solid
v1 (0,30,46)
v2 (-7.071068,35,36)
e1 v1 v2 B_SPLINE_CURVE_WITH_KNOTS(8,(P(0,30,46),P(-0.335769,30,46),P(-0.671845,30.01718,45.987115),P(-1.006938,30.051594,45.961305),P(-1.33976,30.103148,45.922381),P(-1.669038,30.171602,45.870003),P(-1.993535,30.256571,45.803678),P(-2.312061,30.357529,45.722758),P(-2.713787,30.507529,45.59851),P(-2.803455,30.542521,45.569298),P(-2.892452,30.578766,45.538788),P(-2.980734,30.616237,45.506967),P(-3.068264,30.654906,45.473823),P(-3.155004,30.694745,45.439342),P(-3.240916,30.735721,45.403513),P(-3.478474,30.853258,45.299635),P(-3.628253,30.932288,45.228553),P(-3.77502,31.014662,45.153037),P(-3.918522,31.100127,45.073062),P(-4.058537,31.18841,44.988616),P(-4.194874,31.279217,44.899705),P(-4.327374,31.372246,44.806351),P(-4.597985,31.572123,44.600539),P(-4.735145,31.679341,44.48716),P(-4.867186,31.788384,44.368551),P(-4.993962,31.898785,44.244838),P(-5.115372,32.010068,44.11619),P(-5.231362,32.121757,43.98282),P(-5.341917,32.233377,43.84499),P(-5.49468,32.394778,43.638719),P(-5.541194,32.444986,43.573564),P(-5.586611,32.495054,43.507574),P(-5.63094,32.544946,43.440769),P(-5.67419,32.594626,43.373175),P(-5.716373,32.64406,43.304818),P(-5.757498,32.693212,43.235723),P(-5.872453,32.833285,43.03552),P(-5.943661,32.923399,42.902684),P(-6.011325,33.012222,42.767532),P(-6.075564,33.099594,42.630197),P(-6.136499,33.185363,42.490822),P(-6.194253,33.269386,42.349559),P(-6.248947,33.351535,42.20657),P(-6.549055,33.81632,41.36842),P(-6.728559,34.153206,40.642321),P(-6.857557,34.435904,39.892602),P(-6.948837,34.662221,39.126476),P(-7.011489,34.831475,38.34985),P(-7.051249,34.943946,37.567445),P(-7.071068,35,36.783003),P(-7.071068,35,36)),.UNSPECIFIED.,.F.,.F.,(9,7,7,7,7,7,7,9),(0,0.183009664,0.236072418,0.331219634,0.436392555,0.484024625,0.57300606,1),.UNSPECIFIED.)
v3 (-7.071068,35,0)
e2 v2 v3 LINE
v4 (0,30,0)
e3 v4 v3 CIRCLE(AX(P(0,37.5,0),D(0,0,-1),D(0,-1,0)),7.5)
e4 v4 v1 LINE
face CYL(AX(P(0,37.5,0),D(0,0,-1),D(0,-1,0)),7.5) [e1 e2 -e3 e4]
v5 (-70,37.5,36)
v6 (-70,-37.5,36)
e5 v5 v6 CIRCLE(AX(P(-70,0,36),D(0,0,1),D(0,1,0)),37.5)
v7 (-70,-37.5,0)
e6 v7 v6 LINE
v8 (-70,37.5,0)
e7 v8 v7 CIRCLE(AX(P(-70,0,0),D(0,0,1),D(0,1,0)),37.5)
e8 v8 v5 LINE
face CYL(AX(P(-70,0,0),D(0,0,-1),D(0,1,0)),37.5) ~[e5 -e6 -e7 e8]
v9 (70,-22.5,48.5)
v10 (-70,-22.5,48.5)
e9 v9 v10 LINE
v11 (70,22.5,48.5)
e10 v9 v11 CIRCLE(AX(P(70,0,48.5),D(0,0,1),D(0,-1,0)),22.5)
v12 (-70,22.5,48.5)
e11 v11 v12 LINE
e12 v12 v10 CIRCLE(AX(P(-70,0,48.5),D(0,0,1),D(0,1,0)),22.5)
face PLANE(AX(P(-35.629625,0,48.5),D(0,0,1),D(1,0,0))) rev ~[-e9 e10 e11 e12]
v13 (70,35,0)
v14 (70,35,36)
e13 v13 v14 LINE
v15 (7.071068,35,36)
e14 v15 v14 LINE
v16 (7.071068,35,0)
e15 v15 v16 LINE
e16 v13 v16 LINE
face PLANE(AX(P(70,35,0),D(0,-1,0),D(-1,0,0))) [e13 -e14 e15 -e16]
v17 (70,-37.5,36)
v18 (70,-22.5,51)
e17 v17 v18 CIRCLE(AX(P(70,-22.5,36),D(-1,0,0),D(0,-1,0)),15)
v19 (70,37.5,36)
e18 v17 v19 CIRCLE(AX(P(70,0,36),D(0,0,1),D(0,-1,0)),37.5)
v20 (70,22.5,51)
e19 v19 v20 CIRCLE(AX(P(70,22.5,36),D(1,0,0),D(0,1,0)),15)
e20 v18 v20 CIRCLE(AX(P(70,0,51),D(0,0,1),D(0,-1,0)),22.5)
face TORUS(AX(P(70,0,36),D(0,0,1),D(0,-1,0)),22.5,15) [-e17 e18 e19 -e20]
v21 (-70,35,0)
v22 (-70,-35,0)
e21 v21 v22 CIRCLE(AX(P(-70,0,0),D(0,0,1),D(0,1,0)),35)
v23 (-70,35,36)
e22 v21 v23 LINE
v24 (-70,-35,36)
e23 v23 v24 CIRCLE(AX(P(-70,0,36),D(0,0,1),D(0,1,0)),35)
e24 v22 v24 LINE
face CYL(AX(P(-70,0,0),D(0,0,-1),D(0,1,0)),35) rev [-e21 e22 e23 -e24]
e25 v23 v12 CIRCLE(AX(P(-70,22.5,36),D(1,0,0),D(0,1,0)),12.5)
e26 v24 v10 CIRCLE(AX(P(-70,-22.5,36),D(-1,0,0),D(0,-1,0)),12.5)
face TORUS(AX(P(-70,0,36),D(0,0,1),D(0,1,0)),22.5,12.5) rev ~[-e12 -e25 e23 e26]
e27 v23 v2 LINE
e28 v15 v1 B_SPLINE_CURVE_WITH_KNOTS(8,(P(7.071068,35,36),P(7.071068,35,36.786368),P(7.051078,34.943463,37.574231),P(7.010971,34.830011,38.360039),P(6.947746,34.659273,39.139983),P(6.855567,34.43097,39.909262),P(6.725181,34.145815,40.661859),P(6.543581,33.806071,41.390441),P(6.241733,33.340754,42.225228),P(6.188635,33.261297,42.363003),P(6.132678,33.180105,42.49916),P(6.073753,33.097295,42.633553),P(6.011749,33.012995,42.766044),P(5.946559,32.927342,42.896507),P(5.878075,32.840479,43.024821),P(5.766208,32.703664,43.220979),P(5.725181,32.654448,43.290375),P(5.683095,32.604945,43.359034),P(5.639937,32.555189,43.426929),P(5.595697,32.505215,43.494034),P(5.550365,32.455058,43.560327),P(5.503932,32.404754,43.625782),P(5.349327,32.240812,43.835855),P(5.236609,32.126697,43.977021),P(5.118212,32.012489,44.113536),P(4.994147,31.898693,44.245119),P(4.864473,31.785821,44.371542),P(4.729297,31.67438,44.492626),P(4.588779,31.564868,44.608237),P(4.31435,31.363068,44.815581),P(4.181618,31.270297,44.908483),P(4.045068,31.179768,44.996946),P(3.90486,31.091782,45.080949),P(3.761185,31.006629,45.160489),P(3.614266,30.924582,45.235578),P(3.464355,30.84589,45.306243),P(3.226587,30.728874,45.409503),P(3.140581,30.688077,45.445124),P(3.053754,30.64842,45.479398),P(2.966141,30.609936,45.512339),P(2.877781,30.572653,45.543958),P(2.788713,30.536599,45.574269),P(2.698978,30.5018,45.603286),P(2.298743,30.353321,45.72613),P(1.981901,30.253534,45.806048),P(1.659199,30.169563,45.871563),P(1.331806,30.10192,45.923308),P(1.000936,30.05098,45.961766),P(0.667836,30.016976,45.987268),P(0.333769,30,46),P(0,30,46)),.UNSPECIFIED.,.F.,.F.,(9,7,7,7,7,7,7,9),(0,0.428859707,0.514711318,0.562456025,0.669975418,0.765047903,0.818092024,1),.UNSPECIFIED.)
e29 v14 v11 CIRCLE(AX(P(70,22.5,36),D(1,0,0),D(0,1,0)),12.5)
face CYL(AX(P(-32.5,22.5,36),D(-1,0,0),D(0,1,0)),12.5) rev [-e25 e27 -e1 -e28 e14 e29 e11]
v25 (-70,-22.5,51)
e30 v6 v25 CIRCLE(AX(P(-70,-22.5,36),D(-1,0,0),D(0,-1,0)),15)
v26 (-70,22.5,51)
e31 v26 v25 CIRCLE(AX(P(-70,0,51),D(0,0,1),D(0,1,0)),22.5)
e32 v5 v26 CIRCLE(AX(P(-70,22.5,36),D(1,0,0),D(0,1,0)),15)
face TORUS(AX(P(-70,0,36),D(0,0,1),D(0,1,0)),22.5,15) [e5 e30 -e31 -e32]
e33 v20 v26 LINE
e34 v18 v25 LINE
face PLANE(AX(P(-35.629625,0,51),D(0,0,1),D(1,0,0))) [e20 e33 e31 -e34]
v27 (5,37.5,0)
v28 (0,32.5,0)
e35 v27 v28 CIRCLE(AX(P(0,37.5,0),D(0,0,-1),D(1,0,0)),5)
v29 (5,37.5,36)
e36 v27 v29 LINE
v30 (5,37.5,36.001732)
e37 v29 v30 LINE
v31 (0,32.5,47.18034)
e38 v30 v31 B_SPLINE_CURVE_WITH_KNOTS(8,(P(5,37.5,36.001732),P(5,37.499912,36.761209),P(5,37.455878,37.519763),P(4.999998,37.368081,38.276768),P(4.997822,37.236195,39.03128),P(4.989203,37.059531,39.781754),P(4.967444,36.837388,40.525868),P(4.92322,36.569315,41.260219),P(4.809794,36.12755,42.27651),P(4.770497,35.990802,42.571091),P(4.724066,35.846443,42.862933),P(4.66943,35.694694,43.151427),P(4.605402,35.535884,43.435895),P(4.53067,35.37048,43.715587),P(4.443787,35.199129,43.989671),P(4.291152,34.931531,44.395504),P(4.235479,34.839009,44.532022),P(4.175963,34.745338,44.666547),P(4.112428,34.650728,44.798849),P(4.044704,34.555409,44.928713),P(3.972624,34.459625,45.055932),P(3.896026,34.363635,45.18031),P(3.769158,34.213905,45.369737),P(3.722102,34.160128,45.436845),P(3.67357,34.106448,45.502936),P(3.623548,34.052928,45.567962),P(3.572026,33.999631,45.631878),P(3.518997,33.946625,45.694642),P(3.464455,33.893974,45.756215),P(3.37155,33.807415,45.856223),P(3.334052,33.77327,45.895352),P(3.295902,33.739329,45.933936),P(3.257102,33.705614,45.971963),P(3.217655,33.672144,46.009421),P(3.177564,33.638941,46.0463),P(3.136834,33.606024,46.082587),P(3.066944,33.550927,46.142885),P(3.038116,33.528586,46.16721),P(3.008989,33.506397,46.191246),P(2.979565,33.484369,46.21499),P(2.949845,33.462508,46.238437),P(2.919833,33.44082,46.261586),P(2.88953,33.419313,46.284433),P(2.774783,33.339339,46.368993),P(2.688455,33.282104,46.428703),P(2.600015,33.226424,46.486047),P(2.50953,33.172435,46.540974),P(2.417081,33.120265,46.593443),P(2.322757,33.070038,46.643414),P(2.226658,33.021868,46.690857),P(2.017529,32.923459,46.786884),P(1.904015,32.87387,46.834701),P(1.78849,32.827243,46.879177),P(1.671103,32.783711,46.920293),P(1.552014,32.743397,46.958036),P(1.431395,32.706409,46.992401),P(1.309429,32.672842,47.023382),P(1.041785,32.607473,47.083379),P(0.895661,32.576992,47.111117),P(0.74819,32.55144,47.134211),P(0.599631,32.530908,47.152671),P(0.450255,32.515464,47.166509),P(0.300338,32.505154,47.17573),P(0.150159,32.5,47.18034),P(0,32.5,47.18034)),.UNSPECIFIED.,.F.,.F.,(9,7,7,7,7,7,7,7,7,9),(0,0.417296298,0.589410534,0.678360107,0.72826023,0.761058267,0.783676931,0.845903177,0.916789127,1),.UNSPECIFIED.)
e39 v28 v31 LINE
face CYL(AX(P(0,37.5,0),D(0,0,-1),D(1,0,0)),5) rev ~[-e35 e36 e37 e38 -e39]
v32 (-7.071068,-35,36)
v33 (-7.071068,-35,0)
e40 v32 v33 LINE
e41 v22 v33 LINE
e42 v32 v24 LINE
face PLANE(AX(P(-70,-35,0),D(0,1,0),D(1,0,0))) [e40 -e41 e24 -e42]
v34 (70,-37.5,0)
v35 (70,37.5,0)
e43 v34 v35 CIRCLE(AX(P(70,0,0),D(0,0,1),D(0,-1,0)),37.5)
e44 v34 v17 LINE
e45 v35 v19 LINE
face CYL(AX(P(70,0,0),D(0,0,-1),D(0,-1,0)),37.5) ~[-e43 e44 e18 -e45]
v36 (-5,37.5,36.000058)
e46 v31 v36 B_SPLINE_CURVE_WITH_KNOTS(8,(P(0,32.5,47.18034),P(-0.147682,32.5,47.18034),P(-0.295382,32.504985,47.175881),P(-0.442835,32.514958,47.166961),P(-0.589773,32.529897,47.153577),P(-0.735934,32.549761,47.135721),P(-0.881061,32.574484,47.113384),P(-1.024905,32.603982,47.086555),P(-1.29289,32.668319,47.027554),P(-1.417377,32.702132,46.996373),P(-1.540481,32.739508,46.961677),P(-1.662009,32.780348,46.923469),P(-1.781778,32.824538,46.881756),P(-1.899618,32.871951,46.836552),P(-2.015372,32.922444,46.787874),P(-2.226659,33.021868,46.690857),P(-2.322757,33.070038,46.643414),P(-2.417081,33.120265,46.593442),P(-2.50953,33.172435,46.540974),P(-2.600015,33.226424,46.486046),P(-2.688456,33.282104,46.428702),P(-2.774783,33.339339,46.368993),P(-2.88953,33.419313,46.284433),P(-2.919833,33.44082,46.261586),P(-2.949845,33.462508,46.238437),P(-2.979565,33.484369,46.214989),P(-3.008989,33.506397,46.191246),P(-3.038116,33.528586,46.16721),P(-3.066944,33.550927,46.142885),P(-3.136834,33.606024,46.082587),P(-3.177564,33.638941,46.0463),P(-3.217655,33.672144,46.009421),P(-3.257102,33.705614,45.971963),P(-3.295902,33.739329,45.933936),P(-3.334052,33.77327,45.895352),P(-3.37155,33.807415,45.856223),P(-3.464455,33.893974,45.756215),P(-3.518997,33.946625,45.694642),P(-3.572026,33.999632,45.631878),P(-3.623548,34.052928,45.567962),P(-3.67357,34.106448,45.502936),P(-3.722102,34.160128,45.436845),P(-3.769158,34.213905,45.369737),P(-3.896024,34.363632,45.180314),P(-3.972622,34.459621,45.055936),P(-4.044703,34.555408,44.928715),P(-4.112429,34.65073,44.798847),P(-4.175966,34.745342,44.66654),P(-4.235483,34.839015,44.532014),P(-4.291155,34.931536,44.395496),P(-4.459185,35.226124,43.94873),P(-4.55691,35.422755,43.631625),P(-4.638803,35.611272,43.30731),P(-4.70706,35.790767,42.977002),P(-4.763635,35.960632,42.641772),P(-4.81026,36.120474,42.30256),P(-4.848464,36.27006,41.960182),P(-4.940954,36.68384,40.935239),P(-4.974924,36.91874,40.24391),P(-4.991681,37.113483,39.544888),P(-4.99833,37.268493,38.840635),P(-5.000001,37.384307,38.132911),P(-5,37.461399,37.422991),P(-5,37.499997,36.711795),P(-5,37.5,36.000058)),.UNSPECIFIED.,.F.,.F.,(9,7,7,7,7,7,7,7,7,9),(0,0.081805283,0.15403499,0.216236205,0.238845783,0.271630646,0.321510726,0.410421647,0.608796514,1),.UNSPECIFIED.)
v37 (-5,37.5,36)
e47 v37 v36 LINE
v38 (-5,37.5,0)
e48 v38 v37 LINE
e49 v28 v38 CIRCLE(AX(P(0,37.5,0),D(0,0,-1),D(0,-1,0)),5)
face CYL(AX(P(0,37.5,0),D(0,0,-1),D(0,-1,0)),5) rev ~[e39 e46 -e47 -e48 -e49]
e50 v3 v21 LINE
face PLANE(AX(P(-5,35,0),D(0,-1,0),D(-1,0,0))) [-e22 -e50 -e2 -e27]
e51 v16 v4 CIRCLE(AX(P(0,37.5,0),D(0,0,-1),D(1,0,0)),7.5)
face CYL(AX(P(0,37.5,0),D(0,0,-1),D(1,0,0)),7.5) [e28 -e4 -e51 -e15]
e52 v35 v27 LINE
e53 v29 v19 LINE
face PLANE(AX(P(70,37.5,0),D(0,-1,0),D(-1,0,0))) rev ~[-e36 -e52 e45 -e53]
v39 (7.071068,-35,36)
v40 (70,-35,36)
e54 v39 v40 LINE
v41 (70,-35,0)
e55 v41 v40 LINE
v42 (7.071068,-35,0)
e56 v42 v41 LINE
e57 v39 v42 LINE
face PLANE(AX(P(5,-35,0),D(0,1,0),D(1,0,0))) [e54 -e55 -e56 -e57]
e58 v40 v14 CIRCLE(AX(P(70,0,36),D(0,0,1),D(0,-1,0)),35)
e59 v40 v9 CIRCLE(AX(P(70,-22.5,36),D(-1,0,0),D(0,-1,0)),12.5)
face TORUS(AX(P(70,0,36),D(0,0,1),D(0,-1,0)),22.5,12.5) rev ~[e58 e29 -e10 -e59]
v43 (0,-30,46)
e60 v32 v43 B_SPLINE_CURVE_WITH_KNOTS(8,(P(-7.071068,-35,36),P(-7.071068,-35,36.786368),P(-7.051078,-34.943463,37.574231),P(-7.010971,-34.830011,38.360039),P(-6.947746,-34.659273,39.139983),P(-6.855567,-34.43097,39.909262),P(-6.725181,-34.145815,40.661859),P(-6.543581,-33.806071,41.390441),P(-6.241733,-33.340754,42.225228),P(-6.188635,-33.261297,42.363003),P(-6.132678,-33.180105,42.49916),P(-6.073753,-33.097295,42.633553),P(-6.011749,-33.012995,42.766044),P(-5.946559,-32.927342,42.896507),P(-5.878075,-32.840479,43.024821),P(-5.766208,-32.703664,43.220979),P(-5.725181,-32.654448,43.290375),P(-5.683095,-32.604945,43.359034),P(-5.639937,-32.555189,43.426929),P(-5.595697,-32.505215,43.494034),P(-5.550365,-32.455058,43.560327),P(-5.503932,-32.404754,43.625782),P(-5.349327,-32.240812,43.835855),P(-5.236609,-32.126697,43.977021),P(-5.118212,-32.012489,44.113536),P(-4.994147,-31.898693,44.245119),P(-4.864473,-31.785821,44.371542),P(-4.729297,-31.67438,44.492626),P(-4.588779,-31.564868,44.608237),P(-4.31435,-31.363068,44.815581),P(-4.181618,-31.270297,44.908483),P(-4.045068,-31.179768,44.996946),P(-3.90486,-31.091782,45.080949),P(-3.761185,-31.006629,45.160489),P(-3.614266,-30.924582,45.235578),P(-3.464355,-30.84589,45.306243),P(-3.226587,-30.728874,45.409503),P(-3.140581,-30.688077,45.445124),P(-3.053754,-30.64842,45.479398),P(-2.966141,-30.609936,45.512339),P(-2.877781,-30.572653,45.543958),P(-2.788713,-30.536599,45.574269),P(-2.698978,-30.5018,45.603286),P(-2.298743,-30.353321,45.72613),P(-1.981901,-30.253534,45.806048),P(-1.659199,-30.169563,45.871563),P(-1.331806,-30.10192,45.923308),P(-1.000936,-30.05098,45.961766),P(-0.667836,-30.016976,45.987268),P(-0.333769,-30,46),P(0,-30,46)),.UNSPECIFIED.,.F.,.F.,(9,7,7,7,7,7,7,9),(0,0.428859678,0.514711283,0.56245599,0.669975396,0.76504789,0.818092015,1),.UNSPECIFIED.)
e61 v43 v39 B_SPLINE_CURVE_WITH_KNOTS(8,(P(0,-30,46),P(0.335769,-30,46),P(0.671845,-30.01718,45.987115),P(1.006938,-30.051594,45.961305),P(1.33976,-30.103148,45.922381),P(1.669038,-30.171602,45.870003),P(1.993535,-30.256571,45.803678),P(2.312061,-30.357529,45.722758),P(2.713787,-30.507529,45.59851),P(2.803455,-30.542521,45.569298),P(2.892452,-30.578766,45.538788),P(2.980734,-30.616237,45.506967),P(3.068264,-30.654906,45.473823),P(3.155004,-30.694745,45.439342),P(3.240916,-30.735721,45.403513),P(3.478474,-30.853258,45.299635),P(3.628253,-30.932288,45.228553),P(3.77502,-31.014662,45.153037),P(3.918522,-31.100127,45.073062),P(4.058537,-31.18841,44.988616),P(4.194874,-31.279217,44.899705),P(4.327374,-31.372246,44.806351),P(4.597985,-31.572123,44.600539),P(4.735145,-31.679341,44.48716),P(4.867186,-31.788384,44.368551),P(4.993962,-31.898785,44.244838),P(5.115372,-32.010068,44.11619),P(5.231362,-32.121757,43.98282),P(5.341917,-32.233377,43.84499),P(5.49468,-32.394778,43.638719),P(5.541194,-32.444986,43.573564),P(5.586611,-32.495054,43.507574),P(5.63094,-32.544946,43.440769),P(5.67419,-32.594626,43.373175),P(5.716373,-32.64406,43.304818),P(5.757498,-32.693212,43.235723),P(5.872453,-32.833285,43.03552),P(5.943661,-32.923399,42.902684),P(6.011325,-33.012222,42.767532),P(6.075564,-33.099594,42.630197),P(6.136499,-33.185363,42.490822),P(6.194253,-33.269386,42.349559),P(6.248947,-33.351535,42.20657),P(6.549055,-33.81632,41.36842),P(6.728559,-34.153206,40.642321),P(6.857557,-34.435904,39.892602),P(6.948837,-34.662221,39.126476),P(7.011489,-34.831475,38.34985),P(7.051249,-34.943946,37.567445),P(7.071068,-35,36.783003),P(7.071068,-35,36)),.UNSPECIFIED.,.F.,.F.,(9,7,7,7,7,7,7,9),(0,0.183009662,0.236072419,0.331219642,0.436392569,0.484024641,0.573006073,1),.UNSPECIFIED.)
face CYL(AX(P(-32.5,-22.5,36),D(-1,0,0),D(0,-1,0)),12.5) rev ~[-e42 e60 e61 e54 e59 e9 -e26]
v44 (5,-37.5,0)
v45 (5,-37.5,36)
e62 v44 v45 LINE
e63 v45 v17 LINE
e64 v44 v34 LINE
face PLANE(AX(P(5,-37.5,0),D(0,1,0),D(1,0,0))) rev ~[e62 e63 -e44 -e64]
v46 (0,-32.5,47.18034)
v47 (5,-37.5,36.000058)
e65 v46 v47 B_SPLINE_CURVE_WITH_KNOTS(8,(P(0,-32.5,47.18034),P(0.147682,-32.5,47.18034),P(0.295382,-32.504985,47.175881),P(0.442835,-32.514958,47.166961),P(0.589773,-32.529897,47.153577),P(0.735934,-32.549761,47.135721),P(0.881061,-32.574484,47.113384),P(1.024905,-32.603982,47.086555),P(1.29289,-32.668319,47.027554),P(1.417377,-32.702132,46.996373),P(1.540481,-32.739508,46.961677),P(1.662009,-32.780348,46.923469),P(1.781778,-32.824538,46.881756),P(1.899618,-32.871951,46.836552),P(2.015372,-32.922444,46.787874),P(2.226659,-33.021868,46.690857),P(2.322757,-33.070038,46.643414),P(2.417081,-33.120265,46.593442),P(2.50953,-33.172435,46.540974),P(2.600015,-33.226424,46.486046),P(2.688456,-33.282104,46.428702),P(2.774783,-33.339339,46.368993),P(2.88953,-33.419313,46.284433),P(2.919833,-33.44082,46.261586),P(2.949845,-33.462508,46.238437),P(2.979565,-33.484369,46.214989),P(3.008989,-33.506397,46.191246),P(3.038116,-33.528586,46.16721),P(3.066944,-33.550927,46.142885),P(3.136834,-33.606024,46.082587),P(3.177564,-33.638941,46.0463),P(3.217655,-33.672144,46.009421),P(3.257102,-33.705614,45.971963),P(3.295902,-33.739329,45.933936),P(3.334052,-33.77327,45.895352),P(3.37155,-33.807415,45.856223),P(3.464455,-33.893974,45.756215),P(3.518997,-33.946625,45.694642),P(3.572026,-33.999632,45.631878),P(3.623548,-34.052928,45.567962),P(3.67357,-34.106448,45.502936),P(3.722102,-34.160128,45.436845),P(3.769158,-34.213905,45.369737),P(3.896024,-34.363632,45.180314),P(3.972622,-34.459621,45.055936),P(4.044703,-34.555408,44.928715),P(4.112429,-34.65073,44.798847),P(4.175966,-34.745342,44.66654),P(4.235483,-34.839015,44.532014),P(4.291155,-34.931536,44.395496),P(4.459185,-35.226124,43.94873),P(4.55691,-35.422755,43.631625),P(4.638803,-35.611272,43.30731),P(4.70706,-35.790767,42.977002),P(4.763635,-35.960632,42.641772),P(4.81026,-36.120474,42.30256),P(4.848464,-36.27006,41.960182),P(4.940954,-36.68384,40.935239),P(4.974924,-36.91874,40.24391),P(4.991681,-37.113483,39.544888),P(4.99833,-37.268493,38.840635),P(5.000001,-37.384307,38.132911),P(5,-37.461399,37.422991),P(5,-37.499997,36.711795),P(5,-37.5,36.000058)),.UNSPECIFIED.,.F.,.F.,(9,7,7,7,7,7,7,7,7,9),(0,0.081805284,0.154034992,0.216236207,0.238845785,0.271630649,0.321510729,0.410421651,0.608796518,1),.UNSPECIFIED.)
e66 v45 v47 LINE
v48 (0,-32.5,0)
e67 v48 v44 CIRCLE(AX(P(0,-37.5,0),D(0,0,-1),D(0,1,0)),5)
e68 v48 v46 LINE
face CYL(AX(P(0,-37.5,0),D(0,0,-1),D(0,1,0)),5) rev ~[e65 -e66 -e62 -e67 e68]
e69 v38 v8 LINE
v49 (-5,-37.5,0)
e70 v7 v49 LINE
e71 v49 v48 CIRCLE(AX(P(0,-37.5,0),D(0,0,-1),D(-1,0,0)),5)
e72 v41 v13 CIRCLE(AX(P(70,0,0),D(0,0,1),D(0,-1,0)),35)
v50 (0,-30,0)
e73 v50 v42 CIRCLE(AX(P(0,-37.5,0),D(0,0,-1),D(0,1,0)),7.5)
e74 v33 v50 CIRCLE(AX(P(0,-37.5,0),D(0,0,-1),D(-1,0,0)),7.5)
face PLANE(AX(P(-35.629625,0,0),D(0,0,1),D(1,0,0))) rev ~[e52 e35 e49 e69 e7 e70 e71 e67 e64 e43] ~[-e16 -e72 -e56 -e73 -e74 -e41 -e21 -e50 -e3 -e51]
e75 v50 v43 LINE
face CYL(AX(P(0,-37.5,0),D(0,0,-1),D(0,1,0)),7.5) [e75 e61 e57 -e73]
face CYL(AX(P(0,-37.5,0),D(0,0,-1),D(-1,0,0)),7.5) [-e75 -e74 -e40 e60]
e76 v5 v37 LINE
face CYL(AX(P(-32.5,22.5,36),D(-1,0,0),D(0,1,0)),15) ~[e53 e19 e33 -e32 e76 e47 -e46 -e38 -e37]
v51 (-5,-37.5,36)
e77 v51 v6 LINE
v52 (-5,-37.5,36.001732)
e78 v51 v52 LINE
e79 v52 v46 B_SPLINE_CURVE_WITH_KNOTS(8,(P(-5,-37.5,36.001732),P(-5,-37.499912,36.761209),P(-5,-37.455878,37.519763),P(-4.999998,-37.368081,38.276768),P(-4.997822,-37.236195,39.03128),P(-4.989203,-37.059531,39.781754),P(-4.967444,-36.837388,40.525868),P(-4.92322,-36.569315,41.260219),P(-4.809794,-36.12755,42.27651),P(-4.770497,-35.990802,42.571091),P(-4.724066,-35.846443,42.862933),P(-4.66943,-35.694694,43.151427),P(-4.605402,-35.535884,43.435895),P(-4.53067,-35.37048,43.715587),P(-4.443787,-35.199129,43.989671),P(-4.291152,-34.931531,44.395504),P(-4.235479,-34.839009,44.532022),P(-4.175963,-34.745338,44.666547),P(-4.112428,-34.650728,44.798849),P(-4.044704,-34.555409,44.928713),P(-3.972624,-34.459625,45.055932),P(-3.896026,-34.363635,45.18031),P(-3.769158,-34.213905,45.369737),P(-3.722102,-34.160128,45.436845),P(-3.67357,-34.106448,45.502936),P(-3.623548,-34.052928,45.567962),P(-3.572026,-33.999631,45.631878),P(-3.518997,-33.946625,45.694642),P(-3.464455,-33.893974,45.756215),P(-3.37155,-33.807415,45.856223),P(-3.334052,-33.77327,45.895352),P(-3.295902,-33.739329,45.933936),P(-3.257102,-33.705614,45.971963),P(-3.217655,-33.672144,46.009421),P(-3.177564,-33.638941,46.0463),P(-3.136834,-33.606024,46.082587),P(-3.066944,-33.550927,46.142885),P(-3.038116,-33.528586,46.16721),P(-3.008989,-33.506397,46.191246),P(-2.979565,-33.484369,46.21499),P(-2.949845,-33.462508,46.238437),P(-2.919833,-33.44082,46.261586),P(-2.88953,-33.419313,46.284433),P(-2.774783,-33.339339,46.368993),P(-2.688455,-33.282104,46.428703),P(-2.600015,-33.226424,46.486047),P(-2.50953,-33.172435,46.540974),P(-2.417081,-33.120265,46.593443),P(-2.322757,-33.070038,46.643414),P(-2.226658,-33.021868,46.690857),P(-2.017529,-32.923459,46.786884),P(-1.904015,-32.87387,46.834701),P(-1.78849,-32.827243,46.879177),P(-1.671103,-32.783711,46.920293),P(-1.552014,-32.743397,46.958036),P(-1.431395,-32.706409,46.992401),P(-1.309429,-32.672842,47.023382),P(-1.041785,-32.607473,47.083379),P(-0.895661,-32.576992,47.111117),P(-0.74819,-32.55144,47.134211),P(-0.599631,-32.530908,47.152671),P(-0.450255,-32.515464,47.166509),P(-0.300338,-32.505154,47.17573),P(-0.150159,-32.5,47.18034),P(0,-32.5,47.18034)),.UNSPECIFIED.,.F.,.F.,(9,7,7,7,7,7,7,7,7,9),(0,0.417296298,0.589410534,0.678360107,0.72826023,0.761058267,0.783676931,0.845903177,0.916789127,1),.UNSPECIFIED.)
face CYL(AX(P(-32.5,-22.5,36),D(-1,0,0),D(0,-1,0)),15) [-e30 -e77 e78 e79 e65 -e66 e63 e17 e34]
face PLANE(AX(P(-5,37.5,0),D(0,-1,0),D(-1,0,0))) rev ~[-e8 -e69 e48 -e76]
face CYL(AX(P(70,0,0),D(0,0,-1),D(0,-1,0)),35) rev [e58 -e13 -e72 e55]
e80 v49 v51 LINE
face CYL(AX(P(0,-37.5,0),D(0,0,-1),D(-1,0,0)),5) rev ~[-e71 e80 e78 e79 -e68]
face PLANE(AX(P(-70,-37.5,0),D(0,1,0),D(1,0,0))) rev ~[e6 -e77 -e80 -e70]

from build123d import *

# Parameters (mm, degrees)
F1_DEPTH    = 51
F2_T1_DEPTH = 102.5
F2_T3_DEPTH = 102.5
F2_T6_ANGLE = 180
F2_T8_ANGLE = 180
F3_T        = -2.5


# Not quite as in the source:
# - a fillet or chamfer that OpenCascade refuses, or shapes differently, is made with other operations: its cross-section is extruded or revolved along the edge and cut away or added


with BuildPart() as f1:
    # F0 (on Top) → F1 (new body)
    with BuildSketch(Plane.XY):
        with BuildLine():
            Line((-70, 37.5), (-70, -37.5))
            Line((-70, -37.5), (-5, -37.5))
            ThreePointArc((-5, -37.5), (-3.5355339059, -33.9644660941), (0, -32.5))
            Line((0, -32.5), (0, 0))
            Line((0, 0), (0, 32.5))
            ThreePointArc((0, 32.5), (-3.5355339059, 33.9644660941), (-5, 37.5))
            Line((-5, 37.5), (-70, 37.5))
        make_face()
        with BuildLine():
            ThreePointArc((-70, 37.5), (-107.5, 0), (-70, -37.5))
            Line((-70, -37.5), (-70, 37.5))
        make_face()
        with BuildLine():
            Line((0, 0), (0, -32.5))
            ThreePointArc((0, -32.5), (3.5355339059, -33.9644660941), (5, -37.5))
            Line((5, -37.5), (70, -37.5))
            Line((70, -37.5), (70, 37.5))
            Line((70, 37.5), (5, 37.5))
            ThreePointArc((5, 37.5), (3.5355339059, 33.9644660941), (0, 32.5))
            Line((0, 32.5), (0, 0))
        make_face()
        with BuildLine():
            Line((70, 37.5), (70, -37.5))
            ThreePointArc((70, -37.5), (107.5, 0), (70, 37.5))
        make_face()
    extrude(amount=F1_DEPTH)

    # F2: fillet of radius 15 on 6 edges, made by hand

    # F2_s2 → F2_t1 (cut)
    with BuildSketch(Plane.YZ.offset(-32.5)):
        with BuildLine():
            ThreePointArc((-37.5, 36), (-33.1066017178, 46.6066017178), (-22.5, 51))
            Line((-22.5, 51), (-37.5, 51))
            Line((-37.5, 51), (-37.5, 36))
        make_face()
        with BuildLine():
            ThreePointArc((37.5, 36), (33.1066017178, 46.6066017178), (22.5, 51))
            Line((22.5, 51), (37.5, 51))
            Line((37.5, 51), (37.5, 36))
        make_face()
    extrude(amount=F2_T1_DEPTH, mode=Mode.SUBTRACT)

    # F2_s4 → F2_t3 (cut)
    with BuildSketch(Plane.YZ.offset(-70)):
        with BuildLine():
            ThreePointArc((37.5, 36), (33.1066017178, 46.6066017178), (22.5, 51))
            Line((22.5, 51), (37.5, 51))
            Line((37.5, 51), (37.5, 36))
        make_face()
        with BuildLine():
            ThreePointArc((-37.5, 36), (-33.1066017178, 46.6066017178), (-22.5, 51))
            Line((-22.5, 51), (-37.5, 51))
            Line((-37.5, 51), (-37.5, 36))
        make_face()
    extrude(amount=F2_T3_DEPTH, mode=Mode.SUBTRACT)

    # F2_s5 → F2_t6 (revolve, cut)
    with BuildSketch(Plane.YZ.offset(70)):
        with BuildLine():
            ThreePointArc((-37.5, 36), (-33.1066017178, 46.6066017178), (-22.5, 51))
            Line((-22.5, 51), (-37.5, 51))
            Line((-37.5, 51), (-37.5, 36))
        make_face()
    revolve(axis=Axis((70, 0, 51), (0, 0, 1)), revolution_arc=F2_T6_ANGLE, mode=Mode.SUBTRACT)

    # F2_s7 → F2_t8 (revolve, cut)
    with BuildSketch(Plane.YZ.offset(-70)):
        with BuildLine():
            ThreePointArc((37.5, 36), (33.1066017178, 46.6066017178), (22.5, 51))
            Line((22.5, 51), (37.5, 51))
            Line((37.5, 51), (37.5, 36))
        make_face()
    revolve(axis=Axis((-70, 0, 51), (0, 0, 1)), revolution_arc=F2_T8_ANGLE, mode=Mode.SUBTRACT)

    # F3
    f3_openings = [f1.faces().sort_by_distance(p)[0] for p in [
        (0, 0, 0),
    ]]
    offset(amount=F3_T, openings=f3_openings)


solid = f1.part
